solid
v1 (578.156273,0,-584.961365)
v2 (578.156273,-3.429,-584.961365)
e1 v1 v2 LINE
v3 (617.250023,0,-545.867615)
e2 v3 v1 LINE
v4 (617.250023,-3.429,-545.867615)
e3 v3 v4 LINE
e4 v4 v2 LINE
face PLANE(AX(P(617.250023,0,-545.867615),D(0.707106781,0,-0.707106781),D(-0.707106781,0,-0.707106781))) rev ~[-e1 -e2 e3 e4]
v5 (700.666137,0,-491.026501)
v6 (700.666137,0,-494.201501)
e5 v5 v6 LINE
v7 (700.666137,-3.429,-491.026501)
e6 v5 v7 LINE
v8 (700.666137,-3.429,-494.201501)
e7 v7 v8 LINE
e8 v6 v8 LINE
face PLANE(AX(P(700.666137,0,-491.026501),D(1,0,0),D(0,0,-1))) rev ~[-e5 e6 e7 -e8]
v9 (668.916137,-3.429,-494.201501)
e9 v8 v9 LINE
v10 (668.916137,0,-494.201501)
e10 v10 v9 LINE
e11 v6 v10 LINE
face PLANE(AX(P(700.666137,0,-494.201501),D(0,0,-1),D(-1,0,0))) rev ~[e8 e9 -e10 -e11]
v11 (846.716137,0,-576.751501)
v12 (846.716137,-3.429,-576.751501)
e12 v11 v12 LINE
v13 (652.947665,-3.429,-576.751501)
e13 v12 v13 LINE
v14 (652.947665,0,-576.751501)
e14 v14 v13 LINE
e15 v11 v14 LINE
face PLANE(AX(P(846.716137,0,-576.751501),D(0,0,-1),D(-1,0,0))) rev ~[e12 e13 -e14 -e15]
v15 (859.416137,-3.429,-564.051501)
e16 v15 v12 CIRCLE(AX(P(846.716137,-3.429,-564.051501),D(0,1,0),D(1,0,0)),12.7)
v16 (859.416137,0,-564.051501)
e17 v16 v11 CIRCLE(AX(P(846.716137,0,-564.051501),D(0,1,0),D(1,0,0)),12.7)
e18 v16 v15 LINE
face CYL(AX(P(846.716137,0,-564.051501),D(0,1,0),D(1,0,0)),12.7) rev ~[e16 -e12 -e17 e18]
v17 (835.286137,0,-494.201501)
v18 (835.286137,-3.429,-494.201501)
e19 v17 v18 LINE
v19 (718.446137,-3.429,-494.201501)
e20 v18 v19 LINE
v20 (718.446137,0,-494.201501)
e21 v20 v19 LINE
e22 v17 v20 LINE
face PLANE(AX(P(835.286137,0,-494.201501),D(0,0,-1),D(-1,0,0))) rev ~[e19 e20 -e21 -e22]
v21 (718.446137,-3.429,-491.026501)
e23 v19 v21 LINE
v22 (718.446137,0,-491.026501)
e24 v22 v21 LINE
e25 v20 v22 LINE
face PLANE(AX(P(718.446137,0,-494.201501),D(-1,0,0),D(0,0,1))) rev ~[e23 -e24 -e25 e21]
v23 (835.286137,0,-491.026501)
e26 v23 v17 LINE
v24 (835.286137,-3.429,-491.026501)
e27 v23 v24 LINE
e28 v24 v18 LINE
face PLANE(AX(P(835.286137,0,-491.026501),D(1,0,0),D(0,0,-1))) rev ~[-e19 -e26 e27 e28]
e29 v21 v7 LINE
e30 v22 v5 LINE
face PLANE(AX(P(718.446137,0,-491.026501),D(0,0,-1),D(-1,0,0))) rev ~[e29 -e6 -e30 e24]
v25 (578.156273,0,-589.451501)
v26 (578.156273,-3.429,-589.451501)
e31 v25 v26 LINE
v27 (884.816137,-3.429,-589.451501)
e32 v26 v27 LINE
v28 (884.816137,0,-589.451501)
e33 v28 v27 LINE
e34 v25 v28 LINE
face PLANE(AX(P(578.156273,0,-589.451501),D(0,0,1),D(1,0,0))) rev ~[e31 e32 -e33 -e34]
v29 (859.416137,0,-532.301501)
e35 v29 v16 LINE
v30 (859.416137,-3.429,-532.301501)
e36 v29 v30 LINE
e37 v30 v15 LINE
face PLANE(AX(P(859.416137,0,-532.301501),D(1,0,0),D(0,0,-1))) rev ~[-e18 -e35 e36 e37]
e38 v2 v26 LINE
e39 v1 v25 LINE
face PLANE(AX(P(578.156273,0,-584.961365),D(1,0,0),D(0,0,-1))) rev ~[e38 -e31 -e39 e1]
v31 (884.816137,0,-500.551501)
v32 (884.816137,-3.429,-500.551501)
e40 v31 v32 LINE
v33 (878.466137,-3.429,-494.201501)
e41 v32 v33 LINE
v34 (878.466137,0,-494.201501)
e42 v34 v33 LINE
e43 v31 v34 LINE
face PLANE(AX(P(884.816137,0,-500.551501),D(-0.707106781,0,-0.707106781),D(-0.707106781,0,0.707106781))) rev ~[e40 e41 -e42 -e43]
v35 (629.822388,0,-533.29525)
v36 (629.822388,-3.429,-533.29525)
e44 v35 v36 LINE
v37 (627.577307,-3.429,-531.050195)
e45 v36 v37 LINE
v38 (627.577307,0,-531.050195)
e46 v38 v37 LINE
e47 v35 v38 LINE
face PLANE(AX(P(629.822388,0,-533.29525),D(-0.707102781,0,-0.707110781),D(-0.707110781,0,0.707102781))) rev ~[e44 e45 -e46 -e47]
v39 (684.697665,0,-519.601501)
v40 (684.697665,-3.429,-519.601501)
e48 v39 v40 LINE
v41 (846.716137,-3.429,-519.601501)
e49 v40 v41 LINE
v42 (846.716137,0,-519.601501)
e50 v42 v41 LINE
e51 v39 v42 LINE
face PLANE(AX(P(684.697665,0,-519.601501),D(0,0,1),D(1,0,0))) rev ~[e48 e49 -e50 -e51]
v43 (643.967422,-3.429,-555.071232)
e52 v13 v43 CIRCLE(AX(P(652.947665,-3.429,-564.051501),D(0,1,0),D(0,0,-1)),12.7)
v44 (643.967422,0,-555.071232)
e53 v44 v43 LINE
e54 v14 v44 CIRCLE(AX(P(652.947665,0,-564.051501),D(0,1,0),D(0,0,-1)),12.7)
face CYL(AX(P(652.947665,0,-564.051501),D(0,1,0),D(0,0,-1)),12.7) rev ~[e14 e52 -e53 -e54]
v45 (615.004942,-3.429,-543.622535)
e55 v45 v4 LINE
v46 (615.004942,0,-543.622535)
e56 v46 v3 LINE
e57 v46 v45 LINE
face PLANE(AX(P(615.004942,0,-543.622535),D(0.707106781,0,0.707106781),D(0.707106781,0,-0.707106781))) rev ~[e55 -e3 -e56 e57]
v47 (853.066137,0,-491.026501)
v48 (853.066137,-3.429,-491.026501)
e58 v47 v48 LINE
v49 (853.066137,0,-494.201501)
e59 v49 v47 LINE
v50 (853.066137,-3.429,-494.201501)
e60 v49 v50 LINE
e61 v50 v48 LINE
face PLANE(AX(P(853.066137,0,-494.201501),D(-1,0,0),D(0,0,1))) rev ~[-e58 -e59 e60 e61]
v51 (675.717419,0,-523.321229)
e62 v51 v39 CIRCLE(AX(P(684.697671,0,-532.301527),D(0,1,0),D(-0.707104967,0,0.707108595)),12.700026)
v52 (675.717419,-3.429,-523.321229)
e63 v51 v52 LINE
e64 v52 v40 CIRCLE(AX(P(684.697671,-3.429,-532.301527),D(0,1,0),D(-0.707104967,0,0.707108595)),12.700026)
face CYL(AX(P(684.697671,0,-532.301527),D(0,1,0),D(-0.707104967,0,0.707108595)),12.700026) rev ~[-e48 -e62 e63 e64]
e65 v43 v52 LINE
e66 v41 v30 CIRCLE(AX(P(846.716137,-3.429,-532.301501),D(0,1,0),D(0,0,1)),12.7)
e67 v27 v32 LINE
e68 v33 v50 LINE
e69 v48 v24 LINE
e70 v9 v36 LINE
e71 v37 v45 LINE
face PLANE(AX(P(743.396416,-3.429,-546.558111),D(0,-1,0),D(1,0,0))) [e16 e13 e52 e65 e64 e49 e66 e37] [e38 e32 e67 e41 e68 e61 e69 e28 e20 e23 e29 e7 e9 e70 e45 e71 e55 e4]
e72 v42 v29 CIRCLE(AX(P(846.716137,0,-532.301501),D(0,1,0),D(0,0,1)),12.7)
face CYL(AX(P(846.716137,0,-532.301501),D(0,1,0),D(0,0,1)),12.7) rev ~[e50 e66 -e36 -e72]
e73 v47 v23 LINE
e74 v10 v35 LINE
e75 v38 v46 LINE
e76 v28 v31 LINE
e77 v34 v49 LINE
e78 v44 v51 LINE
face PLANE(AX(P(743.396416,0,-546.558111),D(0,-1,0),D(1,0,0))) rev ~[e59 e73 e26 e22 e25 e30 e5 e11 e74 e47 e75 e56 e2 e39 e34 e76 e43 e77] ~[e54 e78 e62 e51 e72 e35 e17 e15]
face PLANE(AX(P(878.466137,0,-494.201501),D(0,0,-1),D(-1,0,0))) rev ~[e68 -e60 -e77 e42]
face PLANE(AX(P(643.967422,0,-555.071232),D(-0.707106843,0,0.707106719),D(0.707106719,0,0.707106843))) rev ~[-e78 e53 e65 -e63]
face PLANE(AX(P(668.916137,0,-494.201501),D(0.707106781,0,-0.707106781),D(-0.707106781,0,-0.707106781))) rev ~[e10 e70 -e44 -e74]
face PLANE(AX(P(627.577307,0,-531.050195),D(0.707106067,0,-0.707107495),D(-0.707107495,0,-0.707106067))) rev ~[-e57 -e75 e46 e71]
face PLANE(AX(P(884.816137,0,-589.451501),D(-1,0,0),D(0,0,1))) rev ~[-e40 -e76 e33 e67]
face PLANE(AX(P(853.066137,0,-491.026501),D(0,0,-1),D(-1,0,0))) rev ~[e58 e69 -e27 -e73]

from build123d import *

# Parameters (mm, degrees)
F1_DEPTH = 3.429


# Not quite as in the source:
# - ends of sketch curves that miss each other by under 0.0002 mm in the source are joined


with BuildPart() as f1:
    # F0 (on Front) → F1 (new body)
    with BuildSketch(Plane.XZ):
        Polygon((718.4461374, -491.0265008), (700.6661374, -491.0265008), (700.6661374, -494.2015008), (668.9161374, -494.2015008), (629.8223878, -533.2952504), (627.5773072, -531.0501952), (615.0049422, -543.6225348), (617.2500228, -545.8676154), (578.1562732, -584.961365), (578.1562732, -589.4515008), (884.8161374, -589.4515008), (884.8161374, -500.5515008), (878.4661374, -494.2015008), (853.0661374, -494.2015008), (853.0661374, -491.0265008), (835.2861374, -491.0265008), (835.2861374, -494.2015008), (718.4461374, -494.2015008), align=None)
        with BuildLine():
            ThreePointArc((859.4161374, -564.0515008), (855.6963935211, -573.0317569211), (846.7161374, -576.7515008))
            Line((846.7161374, -576.7515008), (652.9476654, -576.7515008))
            ThreePointArc((652.9476654, -576.7515008), (641.2143919005, -568.9115720944), (643.9674219789, -555.0712319789))
            Line((643.9674219789, -555.0712319789), (675.7174192, -523.3212292))
            ThreePointArc((675.7174192, -523.3212292), (679.8375941056, -520.5682273005), (684.6976654, -519.6015008))
            Line((684.6976654, -519.6015008), (846.7161374, -519.6015008))
            ThreePointArc((846.7161374, -519.6015008), (855.6963935211, -523.3212446789), (859.4161374, -532.3015008))
            Line((859.4161374, -532.3015008), (859.4161374, -564.0515008))
        make_face(mode=Mode.SUBTRACT)
    extrude(amount=F1_DEPTH)


solid = f1.part
